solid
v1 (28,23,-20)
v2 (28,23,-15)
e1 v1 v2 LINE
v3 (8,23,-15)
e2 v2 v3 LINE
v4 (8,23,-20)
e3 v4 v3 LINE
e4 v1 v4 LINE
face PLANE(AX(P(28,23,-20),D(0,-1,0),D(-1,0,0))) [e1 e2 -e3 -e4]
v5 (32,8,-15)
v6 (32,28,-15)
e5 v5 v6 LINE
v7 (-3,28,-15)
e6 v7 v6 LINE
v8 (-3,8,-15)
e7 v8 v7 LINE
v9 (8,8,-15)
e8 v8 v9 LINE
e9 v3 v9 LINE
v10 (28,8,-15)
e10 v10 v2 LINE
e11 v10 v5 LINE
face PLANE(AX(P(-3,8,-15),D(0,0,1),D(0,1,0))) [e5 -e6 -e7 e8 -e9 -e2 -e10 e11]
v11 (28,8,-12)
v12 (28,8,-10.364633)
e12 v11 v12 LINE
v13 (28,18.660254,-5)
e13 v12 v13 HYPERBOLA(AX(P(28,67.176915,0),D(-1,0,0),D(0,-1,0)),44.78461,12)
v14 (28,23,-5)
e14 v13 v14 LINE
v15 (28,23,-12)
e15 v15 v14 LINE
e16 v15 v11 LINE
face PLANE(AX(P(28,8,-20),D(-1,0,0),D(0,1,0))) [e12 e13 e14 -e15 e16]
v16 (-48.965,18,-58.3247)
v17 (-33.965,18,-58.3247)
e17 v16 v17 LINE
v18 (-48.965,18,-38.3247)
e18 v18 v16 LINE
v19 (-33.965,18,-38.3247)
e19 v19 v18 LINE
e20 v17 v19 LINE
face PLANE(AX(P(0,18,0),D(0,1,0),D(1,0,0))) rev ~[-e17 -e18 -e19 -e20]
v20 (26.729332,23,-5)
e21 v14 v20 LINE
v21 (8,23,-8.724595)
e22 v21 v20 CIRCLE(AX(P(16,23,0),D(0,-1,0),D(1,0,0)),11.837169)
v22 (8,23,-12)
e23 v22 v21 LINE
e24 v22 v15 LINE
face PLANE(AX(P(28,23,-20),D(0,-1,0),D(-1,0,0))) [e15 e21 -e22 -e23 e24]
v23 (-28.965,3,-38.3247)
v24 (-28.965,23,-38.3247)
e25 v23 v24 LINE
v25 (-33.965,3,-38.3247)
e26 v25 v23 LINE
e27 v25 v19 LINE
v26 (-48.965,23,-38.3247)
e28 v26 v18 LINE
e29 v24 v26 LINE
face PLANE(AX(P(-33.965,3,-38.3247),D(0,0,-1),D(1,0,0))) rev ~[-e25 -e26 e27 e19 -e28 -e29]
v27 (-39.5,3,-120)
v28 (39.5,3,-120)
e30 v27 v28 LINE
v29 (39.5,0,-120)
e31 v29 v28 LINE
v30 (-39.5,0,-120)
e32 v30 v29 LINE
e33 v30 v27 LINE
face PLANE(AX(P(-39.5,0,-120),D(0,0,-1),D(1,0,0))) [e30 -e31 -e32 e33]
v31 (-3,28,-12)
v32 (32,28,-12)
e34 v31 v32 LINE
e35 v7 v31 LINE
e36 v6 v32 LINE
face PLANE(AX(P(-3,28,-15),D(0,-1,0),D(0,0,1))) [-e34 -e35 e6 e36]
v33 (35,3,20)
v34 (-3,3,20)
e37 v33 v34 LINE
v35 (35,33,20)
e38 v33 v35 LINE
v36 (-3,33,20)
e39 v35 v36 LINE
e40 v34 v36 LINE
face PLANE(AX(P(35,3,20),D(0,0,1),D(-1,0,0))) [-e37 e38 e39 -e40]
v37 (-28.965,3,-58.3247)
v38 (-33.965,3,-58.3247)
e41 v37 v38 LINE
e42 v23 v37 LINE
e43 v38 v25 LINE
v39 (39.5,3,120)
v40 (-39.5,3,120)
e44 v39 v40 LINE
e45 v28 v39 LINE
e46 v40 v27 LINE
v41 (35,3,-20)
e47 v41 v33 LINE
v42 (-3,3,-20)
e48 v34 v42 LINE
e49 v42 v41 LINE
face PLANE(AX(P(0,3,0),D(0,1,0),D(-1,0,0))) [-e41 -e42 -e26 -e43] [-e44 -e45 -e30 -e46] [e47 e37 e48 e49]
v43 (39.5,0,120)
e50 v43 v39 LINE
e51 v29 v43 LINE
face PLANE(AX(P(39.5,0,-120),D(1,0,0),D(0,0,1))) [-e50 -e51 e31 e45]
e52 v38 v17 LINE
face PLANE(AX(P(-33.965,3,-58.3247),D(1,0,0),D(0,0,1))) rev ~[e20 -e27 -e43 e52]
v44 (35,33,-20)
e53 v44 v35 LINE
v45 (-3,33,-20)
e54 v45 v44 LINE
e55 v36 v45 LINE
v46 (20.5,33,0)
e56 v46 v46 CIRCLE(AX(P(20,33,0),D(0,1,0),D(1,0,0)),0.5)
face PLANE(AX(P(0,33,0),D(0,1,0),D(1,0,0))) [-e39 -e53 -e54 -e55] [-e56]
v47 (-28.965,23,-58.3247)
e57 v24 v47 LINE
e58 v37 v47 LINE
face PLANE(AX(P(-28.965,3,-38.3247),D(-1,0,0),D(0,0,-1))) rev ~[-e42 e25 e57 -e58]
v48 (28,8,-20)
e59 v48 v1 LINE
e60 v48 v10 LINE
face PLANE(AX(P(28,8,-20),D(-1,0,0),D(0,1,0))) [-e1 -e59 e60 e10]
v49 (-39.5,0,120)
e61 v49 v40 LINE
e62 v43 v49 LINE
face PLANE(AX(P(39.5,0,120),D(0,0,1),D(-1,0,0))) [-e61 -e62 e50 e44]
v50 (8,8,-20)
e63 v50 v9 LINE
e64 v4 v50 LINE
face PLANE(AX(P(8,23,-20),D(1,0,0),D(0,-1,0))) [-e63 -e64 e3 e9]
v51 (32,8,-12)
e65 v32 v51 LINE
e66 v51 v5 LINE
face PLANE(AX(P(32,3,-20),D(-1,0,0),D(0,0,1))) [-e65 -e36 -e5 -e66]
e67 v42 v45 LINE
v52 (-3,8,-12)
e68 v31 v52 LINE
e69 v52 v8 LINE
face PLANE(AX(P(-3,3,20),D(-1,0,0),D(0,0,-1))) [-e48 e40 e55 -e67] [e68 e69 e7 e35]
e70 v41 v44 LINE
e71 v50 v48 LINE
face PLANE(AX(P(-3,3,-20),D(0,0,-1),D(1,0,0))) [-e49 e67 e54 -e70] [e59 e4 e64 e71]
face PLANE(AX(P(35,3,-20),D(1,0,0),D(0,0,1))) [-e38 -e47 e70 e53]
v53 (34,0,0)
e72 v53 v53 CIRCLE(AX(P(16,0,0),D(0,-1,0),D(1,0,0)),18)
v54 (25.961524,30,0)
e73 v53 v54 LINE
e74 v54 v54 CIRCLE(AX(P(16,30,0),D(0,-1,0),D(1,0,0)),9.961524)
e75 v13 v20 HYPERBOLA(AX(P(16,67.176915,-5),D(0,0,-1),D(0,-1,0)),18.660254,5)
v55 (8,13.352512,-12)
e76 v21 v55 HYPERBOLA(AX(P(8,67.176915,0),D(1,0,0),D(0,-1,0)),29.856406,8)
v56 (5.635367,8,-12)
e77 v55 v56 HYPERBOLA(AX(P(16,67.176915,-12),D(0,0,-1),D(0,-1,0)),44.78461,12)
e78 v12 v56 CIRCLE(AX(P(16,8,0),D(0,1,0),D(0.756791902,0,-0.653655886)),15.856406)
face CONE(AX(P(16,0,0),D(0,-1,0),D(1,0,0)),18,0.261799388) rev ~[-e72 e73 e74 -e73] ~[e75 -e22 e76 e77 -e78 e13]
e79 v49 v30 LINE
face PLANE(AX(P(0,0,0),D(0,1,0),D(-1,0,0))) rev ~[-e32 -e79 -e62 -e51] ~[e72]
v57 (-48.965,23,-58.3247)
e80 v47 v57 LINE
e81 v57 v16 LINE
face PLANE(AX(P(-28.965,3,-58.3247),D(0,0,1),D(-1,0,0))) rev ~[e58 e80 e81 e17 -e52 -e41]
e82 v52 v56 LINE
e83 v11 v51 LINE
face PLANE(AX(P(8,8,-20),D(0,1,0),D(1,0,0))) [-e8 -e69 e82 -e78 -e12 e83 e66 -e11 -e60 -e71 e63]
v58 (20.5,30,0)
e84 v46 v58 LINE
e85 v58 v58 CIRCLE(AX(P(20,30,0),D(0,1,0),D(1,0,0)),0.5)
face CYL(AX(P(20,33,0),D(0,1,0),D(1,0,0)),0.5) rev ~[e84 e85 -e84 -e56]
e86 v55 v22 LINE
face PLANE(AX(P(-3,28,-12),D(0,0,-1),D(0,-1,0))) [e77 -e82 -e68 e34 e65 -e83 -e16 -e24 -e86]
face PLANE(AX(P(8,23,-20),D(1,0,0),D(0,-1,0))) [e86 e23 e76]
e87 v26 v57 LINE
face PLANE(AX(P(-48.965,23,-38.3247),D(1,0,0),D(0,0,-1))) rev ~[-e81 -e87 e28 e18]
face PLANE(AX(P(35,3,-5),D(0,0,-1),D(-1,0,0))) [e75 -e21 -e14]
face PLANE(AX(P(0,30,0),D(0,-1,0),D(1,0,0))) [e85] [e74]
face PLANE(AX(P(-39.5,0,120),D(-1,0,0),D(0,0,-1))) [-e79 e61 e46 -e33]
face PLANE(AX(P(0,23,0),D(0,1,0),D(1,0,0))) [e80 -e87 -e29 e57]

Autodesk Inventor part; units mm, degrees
ref_plane "YZ Plane" through (0, 0, 0) normal (1, 0, 0) x (0, 1, 0)
ref_plane "XZ Plane" through (0, 0, 0) normal (0, 1, 0) x (-1, 0, 0)
ref_plane "XY Plane" through (0, 0, 0) normal (0, 0, 1) x (1, 0, 0)
sketch "Sketch44" plane through (0, 0, 0) normal (0, 1, 0) x (-1, 0, 0)
  line L0 (-39.5, 120) -> (39.5, 120)
  line L1 (39.5, 120) -> (39.5, -120)
  line L2 (39.5, -120) -> (-39.5, -120)
  line L3 (-39.5, -120) -> (-39.5, 120)
  line L4 (-39.5, 120) -> (39.5, -120) construction
  line L5 (39.5, 120) -> (-39.5, -120) construction
  point P0 (0, 0)
  dimension "d138" = 79
  dimension "d139" = 240
extrude "Extrusion33" add sketch "Sketch44" along normal blind 3
sketch "Sketch45" plane through (0, 3, 0) normal (0, 1, 0) x (1, 0, 0)
  line L0 (35, -20) -> (-3, -20)
  line L1 (-3, -20) -> (-3, 20)
  line L2 (-3, 20) -> (35, 20)
  line L3 (35, 20) -> (35, -20)
  point P0 (0, 0)
  dimension "d142" = 38
  dimension "d143" = 40
extrude "Extrusion34" add sketch "Sketch45" along normal blind 30
sketch "Sketch46" plane through (0, 33, 0) normal (0, 1, 0) x (1, 0, 0)
  point P0 (0, 0)
sketch "Sketch47" plane through (0, 0, 0) normal (0, -1, 0) x (1, 0, 0)
  circle A0 centre (16, 0) radius 18
  point P0 (0, 0)
  dimension "d146" = 36
extrude "Extrusion35" cut sketch "Sketch47" against normal blind 30 draft -15
sketch "Sketch48" plane through (0, 33, 0) normal (0, 1, 0) x (1, 0, 0)
  point P0 (0, 0)
sketch "Sketch49" plane through (0, 33, 0) normal (0, 1, 0) x (1, 0, 0)
  circle A0 centre (20, 0) radius 0.5
  point P0 (0, 0)
  dimension "d149" = 1
extrude "Extrusion36" cut sketch "Sketch49" against normal through all
sketch "Sketch58" plane through (35, 3, -20) normal (0, 0, -1) x (-1, 0, 0)
  line L0 (7, 20) -> (27, 20)
  line L1 (27, 20) -> (27, 5)
  line L2 (27, 5) -> (7, 5)
  line L3 (7, 5) -> (7, 20)
  point P0 (35, -3)
  dimension "d156" = 20
  dimension "d157" = 15
extrude "Extrusion38" cut sketch "Sketch58" against normal blind 15
sketch "Sketch59" plane through (-3, 3, -20) normal (-1, 0, 0) x (0, 0, 1)
  line L0 (5, 25) -> (8, 25)
  line L1 (8, 25) -> (8, 5)
  line L2 (8, 5) -> (5, 5)
  line L3 (5, 5) -> (5, 25)
  point P0 (20, -3)
  dimension "d160" = 3
  dimension "d161" = 20
extrude "Extrusion39" cut sketch "Sketch59" against normal blind 35
sketch "Sketch60" plane through (0, 3, 0) normal (0, 1, 0) x (1, 0, 0)
  line L0 (-33.965, 38.3247) -> (-28.965, 38.3247)
  line L1 (-28.965, 38.3247) -> (-28.965, 58.3247)
  line L2 (-28.965, 58.3247) -> (-33.965, 58.3247)
  line L3 (-33.965, 58.3247) -> (-33.965, 38.3247)
  point P0 (0, 0)
  dimension "d164" = 5
  dimension "d165" = 20
extrude "Extrusion40" add sketch "Sketch60" along normal blind 20
sketch "Sketch61" plane through (0, 23, 0) normal (0, 1, 0) x (1, 0, 0)
  line L0 (-28.965, 38.3247) -> (-28.965, 58.3247) projected
  line L1 (-28.965, 38.3247) -> (-48.965, 38.3247)
  line L2 (-48.965, 38.3247) -> (-48.965, 58.3247)
  line L3 (-48.965, 58.3247) -> (-28.965, 58.3247)
  line L4 (-28.965, 58.3247) -> (-28.965, 38.3247)
  point P0 (0, 0)
  dimension "d168" = 20
  dimension "d169" = 20
extrude "Extrusion41" add sketch "Sketch61" against normal blind 5
properties part number "liquid port_v07"
